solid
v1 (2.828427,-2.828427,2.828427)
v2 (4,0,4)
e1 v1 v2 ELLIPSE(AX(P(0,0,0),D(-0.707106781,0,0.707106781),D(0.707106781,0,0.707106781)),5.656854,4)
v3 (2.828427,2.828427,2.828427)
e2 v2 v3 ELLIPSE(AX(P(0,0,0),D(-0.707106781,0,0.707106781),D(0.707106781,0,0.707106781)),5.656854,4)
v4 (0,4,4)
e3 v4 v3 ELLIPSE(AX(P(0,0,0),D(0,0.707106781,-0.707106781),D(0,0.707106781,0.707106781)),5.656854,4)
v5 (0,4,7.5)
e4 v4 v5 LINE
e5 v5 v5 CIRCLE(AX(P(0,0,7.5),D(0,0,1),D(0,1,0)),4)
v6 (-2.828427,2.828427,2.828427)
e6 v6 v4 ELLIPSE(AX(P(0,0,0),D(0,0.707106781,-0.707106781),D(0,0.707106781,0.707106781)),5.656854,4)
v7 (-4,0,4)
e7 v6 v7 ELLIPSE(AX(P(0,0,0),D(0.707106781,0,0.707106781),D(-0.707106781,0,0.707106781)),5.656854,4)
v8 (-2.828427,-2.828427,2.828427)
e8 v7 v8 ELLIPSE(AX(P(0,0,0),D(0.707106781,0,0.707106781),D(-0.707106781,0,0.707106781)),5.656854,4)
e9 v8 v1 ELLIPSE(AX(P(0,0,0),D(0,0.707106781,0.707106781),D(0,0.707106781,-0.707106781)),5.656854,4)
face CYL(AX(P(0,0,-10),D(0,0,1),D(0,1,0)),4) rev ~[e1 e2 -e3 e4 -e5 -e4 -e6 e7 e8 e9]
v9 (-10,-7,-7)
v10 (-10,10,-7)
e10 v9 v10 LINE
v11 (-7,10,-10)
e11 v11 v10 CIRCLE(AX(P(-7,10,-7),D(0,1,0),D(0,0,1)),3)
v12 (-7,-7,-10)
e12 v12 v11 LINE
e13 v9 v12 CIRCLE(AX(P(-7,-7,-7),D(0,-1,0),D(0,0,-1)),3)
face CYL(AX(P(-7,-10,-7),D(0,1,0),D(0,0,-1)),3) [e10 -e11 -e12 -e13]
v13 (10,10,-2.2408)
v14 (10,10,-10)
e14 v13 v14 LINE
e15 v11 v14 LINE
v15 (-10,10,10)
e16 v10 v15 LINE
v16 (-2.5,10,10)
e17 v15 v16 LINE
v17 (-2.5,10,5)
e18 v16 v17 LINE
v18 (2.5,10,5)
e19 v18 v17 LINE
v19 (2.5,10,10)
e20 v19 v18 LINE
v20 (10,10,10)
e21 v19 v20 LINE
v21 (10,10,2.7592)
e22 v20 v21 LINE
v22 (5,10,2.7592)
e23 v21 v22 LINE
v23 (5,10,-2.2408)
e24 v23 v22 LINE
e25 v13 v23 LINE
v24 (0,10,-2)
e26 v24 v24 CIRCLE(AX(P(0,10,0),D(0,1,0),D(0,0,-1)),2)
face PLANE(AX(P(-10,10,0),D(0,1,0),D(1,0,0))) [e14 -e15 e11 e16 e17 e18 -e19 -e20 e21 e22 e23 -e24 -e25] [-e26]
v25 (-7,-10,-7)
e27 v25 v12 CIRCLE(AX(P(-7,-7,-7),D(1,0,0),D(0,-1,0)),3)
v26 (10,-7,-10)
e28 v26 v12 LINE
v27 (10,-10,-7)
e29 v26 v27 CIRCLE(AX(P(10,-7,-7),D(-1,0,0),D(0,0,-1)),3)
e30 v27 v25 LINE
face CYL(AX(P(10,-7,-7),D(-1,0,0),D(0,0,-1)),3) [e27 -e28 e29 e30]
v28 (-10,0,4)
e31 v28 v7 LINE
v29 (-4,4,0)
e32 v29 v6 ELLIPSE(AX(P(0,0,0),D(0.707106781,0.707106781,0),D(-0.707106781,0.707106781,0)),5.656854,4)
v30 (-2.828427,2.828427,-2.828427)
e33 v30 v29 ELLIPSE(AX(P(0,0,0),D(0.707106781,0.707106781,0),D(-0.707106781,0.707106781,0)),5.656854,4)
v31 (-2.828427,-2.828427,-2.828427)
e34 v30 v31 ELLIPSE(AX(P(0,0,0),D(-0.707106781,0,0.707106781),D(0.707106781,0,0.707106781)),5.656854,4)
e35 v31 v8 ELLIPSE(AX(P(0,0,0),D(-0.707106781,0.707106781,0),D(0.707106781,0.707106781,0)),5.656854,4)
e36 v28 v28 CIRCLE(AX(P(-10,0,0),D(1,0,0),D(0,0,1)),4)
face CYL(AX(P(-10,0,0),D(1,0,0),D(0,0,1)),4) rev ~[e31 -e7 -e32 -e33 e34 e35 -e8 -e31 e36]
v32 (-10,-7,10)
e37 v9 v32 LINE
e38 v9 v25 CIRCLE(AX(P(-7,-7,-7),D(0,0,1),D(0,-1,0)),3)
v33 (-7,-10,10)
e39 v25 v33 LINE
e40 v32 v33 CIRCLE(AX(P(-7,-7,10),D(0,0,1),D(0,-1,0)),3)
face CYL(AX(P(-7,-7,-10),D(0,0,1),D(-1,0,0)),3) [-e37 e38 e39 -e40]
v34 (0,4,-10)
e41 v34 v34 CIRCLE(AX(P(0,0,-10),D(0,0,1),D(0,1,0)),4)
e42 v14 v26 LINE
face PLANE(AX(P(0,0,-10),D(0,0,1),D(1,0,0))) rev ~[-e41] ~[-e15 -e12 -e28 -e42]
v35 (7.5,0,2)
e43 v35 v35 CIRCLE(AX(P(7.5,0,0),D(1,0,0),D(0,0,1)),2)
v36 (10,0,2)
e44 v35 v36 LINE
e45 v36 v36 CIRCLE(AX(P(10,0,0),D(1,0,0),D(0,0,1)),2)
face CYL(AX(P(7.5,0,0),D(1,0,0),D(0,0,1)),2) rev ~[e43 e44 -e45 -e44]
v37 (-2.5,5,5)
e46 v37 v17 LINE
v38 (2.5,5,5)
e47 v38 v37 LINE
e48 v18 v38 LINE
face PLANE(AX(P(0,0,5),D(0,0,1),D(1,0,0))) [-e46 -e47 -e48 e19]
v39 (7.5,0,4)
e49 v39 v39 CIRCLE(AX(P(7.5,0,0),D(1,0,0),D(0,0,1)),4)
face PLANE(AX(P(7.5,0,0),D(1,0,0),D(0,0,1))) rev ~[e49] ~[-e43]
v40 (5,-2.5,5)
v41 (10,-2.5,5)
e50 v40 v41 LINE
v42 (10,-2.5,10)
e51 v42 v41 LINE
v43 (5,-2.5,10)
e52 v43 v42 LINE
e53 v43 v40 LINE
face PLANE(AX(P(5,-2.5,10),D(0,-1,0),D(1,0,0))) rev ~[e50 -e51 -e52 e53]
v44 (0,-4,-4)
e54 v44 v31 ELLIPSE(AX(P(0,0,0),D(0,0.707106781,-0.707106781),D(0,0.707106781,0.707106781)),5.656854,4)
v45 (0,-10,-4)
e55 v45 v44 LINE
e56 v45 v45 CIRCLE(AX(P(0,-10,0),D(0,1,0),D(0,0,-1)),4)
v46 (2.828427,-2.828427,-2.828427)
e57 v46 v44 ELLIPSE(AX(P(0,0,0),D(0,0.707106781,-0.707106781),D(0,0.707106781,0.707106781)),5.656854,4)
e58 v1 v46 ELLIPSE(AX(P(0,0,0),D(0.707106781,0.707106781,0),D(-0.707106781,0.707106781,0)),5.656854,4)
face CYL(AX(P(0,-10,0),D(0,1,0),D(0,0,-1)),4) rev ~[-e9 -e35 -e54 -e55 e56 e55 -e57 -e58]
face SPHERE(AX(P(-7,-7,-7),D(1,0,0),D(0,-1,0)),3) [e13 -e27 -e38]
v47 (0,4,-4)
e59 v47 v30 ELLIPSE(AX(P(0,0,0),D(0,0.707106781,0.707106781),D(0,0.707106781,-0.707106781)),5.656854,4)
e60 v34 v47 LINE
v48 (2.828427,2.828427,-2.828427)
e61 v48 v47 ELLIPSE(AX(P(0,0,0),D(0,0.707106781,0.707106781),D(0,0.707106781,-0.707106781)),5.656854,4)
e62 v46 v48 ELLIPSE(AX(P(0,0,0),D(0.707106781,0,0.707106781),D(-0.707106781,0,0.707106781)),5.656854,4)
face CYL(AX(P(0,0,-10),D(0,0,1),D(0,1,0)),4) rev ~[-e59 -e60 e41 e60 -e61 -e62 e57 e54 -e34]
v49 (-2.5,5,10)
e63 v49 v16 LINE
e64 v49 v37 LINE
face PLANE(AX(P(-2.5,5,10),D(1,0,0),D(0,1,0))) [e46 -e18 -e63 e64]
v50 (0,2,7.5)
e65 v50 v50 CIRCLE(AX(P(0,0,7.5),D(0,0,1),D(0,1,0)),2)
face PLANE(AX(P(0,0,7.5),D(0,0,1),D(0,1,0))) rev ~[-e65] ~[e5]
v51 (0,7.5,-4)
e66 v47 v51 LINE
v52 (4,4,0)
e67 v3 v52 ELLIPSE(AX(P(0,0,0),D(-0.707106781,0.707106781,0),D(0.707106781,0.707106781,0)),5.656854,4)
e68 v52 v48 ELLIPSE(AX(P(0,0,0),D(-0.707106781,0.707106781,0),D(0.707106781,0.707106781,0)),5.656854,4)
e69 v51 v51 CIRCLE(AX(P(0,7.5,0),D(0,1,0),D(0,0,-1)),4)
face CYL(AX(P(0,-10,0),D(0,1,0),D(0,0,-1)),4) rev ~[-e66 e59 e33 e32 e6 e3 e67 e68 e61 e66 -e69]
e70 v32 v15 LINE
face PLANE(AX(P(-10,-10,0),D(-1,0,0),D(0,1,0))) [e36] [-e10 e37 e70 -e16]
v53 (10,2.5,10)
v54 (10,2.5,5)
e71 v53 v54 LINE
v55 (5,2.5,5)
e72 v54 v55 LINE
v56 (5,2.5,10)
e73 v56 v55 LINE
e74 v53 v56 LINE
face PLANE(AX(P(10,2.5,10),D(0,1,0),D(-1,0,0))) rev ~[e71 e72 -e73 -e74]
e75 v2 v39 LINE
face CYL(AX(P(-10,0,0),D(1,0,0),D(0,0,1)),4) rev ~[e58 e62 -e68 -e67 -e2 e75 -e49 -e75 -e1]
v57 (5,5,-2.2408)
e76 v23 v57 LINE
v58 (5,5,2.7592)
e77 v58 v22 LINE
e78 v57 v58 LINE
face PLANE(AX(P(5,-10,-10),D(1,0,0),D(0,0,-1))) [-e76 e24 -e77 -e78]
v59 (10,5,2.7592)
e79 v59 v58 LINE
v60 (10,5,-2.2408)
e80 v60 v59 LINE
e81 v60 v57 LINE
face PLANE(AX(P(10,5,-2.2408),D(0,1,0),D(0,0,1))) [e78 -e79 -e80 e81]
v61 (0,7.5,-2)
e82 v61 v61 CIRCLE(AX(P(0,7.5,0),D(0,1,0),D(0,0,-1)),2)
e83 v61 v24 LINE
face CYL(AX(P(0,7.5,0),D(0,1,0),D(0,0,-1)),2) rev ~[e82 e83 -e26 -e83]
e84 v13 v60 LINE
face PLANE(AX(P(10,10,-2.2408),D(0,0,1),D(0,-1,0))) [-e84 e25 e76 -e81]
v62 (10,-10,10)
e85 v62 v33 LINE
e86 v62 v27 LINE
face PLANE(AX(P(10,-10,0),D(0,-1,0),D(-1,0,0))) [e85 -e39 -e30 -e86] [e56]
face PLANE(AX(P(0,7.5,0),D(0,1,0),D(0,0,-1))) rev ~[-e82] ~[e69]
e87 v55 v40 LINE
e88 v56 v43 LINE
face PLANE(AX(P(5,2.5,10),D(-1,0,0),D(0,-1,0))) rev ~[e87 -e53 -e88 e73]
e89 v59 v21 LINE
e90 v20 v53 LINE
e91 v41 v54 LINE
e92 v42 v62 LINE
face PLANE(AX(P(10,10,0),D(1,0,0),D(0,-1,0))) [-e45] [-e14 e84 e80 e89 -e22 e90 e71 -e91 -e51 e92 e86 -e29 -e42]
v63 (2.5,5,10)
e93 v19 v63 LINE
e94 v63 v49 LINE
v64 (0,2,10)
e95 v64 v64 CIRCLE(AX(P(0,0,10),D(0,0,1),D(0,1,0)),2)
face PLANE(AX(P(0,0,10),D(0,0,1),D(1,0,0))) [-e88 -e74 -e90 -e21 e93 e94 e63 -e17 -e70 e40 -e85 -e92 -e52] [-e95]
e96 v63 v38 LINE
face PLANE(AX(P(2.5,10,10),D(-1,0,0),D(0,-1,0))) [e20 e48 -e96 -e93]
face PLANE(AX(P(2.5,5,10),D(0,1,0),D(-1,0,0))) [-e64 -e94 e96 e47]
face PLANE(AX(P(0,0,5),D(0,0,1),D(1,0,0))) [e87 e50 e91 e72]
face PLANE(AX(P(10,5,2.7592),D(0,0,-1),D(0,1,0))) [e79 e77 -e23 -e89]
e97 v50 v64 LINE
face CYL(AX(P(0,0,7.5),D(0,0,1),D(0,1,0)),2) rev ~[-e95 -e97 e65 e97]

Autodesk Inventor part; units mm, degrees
ref_plane "YZ Plane" through (0, 0, 0) normal (1, 0, 0) x (0, 1, 0)
ref_plane "XZ Plane" through (0, 0, 0) normal (0, 1, 0) x (-1, 0, 0)
ref_plane "XY Plane" through (0, 0, 0) normal (0, 0, 1) x (1, 0, 0)
sketch "Sketch1" plane through (0, 0, 0) normal (0, 0, 1) x (1, 0, 0)
  line L0 (-10, 10) -> (10, 10)
  line L1 (10, 10) -> (10, -10)
  line L2 (10, -10) -> (-10, -10)
  line L3 (-10, -10) -> (-10, 10)
  line L4 (-10, 10) -> (10, -10) construction
  line L5 (10, 10) -> (-10, -10) construction
  point P0 (0, 0)
  dimension "d0" = 20
  dimension "d1" = 20
extrude "Extrusion1" add sketch "Sketch1" along normal mid plane 20
sketch "Sketch2" plane through (0, 0, 10) normal (0, 0, 1) x (1, 0, 0)
  line L0 (10, 10) -> (-10, 10) projected
  line L1 (-2.5, 10) -> (2.5, 10)
  line L2 (2.5, 10) -> (2.5, 5)
  line L3 (2.5, 5) -> (-2.5, 5)
  line L4 (-2.5, 5) -> (-2.5, 10)
  line L5 (-10, 10) -> (-10, -10) projected
  line L6 (10, -10) -> (10, 10) projected
  line L7 (10, 2.5) -> (5, 2.5)
  line L8 (5, 2.5) -> (5, -2.5)
  line L9 (5, -2.5) -> (10, -2.5)
  line L10 (10, -2.5) -> (10, 2.5)
  point P0 (0, 0)
  dimension "d4" = 5
  dimension "d5" = 5
  dimension "d6" = 7.5
  dimension "d7" = 5
  dimension "d8" = 5
  dimension "d9" = 7.5
extrude "Extrusion2" cut sketch "Sketch2" against normal blind 5
sketch "Sketch3" plane through (10, -10, -10) normal (1, 0, 0) x (0, 0, -1)
  line L0 (0, 20) -> (-20, 20) projected
  line L1 (-12.7592, 20) -> (-7.7592, 20)
  line L2 (-7.7592, 20) -> (-7.7592, 15)
  line L3 (-7.7592, 15) -> (-12.7592, 15)
  line L4 (-12.7592, 15) -> (-12.7592, 20)
  point P0 (-10, 10)
  dimension "d12" = 5
  dimension "d13" = 5
extrude "Extrusion3" cut sketch "Sketch3" against normal blind 5
sketch "Sketch8" plane through (-10, -10, 10) normal (-1, 0, 0) x (0, 0, 1)
  circle A0 centre (-10, 10) radius 2.3529
sketch "Sketch9" plane through (-10, -10, 10) normal (0, -1, 0) x (1, 0, 0)
  circle A0 centre (10, -10) radius 2.6586
sketch "Sketch10" plane through (0, 0, -10) normal (0, 0, -1) x (-1, 0, 0)
  circle A0 centre (0, 0) radius 2.2697
hole "Hole3" at (0, -10, 0) direction (0, 1, 0) diameter 4 depth 29.3 tip angle 118 counterbore diameter 8 counterbore depth 17.5
hole "Hole4" at (0, 0, -10) direction (0, 0, 1) diameter 4 depth 29.3 tip angle 118 counterbore diameter 8 counterbore depth 17.5
hole "Hole5" at (-10, 0, 0) direction (1, 0, 0) diameter 4 depth 29.3 tip angle 118 counterbore diameter 8 counterbore depth 17.5
fillet "Fillet2" radius 3 3 edges at (0, -10, -10) (-10, -10, 0) (-10, 0, -10)
properties part number "HansKube.stl"
